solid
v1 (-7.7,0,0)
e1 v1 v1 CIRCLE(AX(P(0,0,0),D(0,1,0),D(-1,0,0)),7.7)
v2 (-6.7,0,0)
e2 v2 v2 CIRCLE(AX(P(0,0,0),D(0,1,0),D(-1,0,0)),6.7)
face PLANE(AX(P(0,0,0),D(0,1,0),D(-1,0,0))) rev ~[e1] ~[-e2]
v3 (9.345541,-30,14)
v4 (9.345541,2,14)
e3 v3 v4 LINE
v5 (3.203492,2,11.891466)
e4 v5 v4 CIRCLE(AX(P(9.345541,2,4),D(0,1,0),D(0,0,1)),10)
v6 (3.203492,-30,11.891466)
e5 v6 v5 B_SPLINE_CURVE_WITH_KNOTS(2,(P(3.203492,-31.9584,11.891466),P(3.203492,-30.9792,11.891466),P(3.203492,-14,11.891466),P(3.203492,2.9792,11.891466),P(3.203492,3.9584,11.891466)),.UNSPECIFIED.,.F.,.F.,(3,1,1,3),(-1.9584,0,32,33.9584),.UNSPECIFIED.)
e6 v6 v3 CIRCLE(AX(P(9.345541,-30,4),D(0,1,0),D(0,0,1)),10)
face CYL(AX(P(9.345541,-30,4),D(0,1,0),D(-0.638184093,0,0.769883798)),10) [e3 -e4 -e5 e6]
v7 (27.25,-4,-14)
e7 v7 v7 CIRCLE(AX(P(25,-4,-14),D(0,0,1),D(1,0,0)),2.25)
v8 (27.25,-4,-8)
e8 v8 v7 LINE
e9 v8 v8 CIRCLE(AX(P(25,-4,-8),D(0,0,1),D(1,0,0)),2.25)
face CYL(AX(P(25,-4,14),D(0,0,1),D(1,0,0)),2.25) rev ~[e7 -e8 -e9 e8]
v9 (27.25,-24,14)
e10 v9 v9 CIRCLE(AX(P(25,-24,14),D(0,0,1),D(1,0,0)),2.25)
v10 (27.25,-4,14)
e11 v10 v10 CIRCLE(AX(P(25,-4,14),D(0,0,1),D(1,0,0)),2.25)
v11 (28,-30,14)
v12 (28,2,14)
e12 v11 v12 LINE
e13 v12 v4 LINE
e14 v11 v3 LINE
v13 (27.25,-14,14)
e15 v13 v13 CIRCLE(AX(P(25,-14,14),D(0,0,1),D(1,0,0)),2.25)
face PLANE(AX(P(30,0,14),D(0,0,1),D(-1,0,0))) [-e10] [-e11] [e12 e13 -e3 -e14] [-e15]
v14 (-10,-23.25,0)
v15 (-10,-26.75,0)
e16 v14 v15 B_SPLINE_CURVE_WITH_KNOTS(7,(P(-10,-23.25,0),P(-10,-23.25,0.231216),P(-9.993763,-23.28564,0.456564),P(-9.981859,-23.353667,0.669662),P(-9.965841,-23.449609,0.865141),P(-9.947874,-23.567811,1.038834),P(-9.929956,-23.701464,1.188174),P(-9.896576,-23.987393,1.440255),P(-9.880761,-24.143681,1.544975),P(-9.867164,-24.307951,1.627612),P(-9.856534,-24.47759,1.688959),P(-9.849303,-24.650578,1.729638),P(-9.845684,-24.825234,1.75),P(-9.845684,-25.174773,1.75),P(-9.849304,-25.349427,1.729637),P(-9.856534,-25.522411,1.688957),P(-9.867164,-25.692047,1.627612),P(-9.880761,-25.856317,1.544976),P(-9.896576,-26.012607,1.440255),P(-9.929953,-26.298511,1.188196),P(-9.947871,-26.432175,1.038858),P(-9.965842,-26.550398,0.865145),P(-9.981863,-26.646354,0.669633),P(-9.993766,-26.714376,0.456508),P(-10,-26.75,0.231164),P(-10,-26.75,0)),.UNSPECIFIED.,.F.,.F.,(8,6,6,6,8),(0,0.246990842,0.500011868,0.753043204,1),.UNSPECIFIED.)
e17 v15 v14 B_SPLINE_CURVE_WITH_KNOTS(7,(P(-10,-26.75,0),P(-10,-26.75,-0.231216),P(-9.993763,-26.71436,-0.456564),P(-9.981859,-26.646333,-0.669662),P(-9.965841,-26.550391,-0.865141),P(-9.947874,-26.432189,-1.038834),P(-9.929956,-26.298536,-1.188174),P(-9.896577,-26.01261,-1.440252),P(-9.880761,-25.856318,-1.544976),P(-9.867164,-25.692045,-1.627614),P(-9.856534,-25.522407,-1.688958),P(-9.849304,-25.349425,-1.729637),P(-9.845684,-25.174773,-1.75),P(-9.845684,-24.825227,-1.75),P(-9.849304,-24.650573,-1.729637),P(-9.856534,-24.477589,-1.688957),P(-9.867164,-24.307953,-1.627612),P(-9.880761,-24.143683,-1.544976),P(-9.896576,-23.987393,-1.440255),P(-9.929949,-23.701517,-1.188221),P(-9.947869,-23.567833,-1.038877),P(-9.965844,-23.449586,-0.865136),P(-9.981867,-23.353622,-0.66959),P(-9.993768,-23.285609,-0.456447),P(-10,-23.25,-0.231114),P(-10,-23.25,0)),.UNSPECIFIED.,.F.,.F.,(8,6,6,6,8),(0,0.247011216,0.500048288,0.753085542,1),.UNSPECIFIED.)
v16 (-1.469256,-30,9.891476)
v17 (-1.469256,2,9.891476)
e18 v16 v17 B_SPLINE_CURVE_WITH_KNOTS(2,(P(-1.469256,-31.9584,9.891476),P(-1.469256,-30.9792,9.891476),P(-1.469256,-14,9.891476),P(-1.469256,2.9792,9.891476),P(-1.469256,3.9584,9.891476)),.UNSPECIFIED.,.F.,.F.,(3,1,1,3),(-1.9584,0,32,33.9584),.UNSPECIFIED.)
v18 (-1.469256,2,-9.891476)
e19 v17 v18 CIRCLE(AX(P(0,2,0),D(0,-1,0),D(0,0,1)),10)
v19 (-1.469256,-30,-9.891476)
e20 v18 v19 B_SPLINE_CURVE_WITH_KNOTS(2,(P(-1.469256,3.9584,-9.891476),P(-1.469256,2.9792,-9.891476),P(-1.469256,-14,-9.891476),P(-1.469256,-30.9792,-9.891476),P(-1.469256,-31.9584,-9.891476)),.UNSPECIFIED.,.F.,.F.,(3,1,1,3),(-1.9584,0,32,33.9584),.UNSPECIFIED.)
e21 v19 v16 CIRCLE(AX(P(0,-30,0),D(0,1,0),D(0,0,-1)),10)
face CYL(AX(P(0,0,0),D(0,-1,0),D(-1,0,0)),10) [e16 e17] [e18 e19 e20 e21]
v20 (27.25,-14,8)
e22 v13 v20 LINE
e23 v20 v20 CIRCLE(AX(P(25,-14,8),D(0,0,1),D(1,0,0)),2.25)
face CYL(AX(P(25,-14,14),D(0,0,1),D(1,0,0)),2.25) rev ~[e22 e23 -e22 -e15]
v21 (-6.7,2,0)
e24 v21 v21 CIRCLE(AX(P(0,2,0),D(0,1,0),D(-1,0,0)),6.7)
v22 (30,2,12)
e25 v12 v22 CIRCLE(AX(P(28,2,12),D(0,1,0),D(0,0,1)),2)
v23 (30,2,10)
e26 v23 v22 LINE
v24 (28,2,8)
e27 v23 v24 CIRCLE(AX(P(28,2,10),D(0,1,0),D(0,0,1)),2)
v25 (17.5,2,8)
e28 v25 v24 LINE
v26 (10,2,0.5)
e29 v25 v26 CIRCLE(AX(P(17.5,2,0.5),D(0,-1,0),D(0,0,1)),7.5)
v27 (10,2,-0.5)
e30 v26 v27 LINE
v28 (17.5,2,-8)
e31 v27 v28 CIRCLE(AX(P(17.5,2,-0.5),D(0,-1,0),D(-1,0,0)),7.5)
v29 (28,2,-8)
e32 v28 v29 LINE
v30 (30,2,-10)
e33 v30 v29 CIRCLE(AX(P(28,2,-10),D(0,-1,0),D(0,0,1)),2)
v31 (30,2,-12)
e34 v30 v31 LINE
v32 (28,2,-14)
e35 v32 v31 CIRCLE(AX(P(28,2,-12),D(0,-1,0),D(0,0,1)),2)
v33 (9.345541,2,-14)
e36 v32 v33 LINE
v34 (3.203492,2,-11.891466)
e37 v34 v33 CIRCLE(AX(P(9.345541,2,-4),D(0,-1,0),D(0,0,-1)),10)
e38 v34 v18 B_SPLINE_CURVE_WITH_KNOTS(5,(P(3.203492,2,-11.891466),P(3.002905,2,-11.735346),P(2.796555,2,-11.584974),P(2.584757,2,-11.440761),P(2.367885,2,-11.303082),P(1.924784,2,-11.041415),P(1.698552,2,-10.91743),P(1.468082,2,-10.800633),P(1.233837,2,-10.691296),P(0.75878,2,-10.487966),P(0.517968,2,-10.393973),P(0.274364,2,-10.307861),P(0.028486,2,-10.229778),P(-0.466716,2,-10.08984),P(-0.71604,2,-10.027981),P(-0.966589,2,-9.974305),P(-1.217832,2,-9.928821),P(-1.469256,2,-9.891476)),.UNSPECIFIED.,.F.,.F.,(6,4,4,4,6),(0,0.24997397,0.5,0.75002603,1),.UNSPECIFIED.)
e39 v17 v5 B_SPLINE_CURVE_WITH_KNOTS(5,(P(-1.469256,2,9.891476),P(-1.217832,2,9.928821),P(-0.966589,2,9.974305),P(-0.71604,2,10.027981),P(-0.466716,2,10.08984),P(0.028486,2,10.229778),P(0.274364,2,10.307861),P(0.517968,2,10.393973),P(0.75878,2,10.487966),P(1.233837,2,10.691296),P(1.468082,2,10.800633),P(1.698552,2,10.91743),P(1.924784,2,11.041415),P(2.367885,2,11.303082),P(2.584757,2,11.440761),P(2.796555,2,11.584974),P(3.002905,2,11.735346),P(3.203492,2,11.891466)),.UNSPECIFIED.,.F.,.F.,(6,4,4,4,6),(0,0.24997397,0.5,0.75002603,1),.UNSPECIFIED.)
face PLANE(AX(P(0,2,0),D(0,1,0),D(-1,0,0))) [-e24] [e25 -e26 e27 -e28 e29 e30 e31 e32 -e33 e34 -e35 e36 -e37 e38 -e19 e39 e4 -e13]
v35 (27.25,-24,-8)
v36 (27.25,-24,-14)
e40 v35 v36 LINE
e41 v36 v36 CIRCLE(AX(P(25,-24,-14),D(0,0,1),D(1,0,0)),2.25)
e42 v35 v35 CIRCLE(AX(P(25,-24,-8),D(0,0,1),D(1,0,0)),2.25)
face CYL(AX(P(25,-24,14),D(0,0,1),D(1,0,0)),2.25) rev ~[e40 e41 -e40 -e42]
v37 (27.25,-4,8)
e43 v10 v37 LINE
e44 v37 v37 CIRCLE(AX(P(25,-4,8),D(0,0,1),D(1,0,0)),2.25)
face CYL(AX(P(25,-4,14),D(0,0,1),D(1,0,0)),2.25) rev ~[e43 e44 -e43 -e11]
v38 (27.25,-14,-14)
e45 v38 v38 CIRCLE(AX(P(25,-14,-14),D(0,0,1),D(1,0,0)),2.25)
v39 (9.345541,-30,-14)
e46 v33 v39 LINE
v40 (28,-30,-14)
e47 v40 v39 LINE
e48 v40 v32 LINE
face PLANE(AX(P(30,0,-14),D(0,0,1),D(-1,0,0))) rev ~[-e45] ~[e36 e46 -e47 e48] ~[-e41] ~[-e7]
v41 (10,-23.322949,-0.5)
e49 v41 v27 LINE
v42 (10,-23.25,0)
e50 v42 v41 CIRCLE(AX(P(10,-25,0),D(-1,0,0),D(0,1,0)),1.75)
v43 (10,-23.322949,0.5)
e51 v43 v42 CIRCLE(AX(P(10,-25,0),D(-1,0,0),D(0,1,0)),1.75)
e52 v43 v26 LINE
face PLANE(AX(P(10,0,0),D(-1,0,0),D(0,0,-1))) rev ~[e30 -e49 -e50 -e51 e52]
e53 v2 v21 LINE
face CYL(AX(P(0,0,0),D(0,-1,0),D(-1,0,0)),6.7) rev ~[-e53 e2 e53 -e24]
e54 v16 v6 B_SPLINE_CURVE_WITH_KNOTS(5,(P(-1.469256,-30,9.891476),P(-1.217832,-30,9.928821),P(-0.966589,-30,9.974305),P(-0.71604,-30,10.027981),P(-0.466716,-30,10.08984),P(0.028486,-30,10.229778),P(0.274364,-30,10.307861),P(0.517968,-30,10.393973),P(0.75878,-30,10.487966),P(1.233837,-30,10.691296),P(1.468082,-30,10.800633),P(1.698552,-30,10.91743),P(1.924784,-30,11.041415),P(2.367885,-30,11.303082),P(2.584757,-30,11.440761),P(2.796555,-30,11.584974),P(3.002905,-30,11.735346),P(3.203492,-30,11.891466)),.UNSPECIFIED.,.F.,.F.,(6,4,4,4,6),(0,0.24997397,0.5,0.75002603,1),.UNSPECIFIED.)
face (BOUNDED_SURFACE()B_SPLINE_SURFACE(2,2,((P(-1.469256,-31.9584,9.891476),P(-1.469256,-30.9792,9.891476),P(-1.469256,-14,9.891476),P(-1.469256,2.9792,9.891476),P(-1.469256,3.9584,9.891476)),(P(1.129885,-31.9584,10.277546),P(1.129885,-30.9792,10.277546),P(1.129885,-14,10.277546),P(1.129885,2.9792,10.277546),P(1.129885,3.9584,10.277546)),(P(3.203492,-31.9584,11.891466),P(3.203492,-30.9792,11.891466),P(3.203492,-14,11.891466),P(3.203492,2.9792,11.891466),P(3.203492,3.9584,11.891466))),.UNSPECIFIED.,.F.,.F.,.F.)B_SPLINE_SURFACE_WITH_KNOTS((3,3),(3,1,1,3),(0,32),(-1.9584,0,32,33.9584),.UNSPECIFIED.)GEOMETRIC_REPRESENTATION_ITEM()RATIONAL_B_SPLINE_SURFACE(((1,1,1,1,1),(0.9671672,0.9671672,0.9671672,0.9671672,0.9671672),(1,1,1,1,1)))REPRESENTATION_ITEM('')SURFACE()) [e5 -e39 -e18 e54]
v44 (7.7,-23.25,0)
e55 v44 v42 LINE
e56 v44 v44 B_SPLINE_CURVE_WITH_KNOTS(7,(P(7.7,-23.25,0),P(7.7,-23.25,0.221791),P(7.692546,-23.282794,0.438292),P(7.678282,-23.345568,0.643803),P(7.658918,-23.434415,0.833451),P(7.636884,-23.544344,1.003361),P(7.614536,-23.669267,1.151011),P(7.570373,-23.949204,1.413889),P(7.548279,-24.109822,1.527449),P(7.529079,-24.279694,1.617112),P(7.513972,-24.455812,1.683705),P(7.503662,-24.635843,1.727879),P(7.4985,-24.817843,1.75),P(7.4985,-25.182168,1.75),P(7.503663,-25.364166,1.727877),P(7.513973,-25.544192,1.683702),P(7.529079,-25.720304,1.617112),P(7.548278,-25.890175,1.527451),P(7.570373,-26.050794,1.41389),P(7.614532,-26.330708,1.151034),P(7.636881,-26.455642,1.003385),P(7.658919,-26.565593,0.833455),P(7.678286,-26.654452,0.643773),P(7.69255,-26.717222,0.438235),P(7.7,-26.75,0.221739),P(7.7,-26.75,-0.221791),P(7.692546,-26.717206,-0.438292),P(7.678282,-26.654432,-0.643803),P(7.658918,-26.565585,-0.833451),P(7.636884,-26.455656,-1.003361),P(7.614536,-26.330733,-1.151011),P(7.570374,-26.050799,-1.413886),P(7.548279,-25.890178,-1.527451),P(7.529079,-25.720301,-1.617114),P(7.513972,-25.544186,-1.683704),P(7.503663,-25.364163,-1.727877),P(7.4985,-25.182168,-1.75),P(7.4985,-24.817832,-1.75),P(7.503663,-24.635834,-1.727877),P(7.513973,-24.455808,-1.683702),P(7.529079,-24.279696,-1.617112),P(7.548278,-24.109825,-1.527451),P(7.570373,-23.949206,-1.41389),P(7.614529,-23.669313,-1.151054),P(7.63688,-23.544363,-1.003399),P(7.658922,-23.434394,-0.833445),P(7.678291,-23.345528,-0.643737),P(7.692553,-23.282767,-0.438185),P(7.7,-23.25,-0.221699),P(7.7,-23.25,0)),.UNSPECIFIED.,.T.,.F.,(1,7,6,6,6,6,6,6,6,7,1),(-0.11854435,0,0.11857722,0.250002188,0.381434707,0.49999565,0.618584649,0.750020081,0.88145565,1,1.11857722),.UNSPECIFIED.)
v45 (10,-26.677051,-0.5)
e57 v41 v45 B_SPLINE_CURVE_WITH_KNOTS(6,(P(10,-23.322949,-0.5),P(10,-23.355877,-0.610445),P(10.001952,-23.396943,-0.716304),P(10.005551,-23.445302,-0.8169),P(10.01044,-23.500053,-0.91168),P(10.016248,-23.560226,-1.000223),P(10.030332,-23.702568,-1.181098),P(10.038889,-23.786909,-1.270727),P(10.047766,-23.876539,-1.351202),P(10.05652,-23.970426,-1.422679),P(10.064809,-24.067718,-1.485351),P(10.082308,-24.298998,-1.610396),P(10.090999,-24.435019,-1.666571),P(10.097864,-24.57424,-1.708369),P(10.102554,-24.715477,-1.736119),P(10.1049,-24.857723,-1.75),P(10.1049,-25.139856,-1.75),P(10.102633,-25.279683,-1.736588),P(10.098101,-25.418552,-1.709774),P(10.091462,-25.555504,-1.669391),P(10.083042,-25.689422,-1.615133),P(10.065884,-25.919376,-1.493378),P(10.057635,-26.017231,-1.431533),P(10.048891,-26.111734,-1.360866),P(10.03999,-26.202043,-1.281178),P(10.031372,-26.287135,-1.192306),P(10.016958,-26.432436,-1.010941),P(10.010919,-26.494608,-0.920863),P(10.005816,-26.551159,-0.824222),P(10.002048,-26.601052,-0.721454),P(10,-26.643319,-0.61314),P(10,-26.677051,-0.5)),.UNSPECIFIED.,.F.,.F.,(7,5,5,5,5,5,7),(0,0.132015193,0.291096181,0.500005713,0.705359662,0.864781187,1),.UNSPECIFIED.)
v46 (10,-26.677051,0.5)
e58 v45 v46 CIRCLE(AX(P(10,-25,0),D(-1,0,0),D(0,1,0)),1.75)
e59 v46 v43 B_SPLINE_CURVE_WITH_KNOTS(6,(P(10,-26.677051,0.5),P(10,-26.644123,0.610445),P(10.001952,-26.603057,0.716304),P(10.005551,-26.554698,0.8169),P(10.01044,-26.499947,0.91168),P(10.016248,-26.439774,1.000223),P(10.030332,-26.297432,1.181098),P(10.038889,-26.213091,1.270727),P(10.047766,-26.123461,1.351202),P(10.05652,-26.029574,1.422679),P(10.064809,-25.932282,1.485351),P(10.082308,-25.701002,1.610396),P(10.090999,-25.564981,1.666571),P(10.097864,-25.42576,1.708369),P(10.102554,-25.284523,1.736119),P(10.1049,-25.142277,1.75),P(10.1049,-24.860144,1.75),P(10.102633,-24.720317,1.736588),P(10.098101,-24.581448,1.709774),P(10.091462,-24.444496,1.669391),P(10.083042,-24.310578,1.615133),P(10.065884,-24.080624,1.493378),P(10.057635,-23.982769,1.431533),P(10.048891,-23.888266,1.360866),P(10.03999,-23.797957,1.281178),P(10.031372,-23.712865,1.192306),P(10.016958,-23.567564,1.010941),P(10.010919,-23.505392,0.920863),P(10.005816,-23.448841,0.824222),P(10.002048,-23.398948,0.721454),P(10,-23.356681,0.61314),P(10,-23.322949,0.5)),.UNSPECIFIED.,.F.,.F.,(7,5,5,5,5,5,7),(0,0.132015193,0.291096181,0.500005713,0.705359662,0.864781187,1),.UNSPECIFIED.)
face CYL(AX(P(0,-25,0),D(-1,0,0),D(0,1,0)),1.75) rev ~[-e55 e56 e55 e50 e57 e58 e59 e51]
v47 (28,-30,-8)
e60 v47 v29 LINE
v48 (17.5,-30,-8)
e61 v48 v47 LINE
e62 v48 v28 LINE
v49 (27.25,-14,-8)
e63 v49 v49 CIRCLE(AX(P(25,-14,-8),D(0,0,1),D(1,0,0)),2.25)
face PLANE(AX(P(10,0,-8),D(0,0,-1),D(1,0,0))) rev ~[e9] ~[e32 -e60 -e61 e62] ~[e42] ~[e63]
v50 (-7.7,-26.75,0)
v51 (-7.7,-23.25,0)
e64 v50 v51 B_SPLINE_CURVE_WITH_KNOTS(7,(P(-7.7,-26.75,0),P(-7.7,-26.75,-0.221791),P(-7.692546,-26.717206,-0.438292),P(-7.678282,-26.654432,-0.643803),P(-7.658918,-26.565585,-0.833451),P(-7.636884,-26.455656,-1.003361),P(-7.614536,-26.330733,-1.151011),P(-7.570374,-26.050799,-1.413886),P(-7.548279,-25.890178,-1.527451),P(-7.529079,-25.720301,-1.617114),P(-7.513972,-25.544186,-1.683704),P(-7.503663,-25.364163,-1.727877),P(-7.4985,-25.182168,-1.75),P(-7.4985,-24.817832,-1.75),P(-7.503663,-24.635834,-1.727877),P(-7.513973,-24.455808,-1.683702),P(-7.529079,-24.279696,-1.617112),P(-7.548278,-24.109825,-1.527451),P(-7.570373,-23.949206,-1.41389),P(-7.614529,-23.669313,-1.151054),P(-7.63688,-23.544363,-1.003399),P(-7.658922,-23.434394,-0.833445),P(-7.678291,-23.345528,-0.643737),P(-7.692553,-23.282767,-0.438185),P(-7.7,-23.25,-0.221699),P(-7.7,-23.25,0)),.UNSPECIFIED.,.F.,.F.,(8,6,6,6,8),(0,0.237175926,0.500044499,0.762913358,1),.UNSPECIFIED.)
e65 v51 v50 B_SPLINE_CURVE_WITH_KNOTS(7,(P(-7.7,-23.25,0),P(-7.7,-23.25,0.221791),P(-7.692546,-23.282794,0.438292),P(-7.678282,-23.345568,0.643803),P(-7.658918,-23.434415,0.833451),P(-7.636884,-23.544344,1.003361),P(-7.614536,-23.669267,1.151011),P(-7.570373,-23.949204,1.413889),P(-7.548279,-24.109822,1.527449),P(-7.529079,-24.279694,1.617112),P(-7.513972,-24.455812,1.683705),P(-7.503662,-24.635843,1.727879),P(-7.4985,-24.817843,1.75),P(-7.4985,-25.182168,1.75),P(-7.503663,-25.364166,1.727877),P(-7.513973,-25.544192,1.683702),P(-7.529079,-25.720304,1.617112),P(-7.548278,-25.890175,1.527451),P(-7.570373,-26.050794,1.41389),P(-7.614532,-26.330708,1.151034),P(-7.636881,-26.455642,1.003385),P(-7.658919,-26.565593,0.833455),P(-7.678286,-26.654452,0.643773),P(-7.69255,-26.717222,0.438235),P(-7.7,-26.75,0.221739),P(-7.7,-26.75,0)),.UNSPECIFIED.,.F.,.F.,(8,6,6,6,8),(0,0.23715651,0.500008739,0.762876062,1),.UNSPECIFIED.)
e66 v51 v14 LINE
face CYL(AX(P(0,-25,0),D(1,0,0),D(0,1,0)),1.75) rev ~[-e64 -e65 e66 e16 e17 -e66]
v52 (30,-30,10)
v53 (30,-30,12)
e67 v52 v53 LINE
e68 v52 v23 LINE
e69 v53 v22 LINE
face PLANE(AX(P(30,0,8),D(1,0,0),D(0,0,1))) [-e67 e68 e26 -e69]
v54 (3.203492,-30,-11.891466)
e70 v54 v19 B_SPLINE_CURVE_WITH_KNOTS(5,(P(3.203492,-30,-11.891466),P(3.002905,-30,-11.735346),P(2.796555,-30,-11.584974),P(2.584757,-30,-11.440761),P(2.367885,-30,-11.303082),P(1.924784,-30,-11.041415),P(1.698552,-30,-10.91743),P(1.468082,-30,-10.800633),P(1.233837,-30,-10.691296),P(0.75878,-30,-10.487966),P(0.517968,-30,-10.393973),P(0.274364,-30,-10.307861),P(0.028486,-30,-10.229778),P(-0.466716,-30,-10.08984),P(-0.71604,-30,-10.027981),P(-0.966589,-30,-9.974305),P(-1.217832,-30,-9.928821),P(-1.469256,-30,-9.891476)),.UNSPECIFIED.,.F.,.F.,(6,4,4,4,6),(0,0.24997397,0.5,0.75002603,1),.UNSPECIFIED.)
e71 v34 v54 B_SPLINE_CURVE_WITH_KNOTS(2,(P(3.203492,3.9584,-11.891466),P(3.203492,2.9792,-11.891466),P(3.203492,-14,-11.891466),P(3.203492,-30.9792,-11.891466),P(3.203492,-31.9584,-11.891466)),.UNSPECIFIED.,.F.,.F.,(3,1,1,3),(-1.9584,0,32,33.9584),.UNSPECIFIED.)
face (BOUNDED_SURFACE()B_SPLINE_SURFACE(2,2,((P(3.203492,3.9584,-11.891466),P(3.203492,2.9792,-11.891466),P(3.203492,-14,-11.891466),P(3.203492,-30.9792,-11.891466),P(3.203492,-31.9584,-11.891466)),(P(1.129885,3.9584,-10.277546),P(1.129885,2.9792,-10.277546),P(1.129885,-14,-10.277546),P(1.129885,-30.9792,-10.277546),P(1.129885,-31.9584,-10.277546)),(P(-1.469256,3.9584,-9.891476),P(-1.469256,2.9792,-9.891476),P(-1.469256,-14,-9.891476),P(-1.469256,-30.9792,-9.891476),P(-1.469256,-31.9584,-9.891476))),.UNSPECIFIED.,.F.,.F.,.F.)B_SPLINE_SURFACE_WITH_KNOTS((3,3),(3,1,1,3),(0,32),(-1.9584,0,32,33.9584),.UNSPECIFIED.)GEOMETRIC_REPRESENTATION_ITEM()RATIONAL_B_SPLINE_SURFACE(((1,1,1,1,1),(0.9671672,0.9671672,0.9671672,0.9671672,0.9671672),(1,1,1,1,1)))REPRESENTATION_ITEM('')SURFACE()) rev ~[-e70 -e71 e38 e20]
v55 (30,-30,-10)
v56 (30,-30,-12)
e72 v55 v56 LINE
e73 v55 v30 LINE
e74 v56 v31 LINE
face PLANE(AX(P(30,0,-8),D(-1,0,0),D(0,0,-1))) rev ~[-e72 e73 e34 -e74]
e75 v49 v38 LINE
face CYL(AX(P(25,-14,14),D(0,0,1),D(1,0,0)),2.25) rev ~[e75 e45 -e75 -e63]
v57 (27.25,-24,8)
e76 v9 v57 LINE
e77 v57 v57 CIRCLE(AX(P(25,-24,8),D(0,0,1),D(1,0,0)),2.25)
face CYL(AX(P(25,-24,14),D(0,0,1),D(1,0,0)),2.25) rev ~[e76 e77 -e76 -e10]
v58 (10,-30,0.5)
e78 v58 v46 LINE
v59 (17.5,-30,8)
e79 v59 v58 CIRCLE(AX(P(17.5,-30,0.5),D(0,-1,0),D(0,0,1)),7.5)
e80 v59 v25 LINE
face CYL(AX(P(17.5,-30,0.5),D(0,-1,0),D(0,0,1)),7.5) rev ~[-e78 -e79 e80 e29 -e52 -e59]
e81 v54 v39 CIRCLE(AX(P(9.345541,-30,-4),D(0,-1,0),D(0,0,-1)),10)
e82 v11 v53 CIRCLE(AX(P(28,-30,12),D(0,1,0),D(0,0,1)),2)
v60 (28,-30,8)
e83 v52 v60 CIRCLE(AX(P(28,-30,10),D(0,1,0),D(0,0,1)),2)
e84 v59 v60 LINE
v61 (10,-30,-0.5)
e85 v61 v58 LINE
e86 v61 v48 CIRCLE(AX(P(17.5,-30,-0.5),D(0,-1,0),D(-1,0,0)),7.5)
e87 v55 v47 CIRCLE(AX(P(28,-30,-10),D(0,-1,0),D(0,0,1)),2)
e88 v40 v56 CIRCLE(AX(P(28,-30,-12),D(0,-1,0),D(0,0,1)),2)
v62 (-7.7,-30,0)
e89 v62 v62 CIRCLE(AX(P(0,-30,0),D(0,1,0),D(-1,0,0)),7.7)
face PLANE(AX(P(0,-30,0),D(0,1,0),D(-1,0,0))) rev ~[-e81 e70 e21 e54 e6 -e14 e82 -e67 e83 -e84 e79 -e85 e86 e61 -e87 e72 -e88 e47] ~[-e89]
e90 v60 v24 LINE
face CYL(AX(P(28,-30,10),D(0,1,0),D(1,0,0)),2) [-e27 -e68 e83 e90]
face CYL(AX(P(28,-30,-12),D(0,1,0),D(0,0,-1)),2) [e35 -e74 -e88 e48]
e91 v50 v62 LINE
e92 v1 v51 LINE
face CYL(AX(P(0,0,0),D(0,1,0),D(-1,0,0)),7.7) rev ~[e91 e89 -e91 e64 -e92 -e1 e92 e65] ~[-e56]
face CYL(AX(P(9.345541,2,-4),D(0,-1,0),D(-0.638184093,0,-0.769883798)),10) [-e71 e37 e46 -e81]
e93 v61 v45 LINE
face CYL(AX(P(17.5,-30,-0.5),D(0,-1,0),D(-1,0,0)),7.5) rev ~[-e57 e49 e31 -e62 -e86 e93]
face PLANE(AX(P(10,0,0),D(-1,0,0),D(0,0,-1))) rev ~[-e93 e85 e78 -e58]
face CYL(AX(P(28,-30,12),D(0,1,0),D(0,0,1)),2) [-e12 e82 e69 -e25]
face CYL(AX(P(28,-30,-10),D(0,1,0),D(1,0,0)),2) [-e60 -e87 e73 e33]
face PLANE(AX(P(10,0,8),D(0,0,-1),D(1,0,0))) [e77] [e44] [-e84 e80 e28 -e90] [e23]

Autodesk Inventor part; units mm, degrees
ref_plane "YZ Plane" through (0, 0, 0) normal (1, 0, 0) x (0, 1, 0)
ref_plane "XZ Plane" through (0, 0, 0) normal (0, 1, 0) x (-1, 0, 0)
ref_plane "XY Plane" through (0, 0, 0) normal (0, 0, 1) x (1, 0, 0)
sketch "Sketch1" plane through (0, 0, 0) normal (0, 1, 0) x (-1, 0, 0)
  circle A0 centre (0, 0) radius 10
  circle A1 centre (0, 0) radius 6.7
  circle A2 centre (0, 0) radius 7.7
  line L0 (-10, 8) -> (-10, -8)
  line L1 (0, 0) -> (-40.0758, 0) construction
  line L2 (-5, 8) -> (-30, 8)
  line L3 (-30, 8) -> (-30, 14)
  line L4 (-30, 14) -> (-5, 14)
  line L5 (-5, 14) -> (-5, 8)
  line L6 (-5, -8) -> (-30, -8)
  line L7 (-30, -8) -> (-30, -14)
  line L8 (-30, -14) -> (-5, -14)
  line L9 (-5, -14) -> (-5, -8)
  line L10 (0, -10) -> (-5, -11)
  line L11 (0, 10) -> (-5, 11)
  point P0 (-10, 0)
  point P1 (-10, 0)
  point P2 (2.5508, 9.6692)
  point P3 (2.5508, -9.6692)
  point P4 (-30, 11)
  point P5 (-10, 8)
  point P6 (-5, 8.6603)
  point P7 (-5, -8.6603)
  point P8 (-6, -8)
  point P9 (-6, 8)
  dimension "d0" = 13.4
  dimension "d1" = 15.4
  dimension "d37" = 20
  dimension "d38" = 20
  dimension "d39" = 6
  dimension "d40" = 5
  dimension "d46" = 16
extrude "Extrusion1" add sketch "Sketch1" along normal blind 2 contours A0 L9 L6 L2 L5 | A0 L5 L11 | L10 L9 A0 | L5 L2 A0 | A0 L2 L3 L4 L5 | L9 L8 L7 L6 A0 | A0 L6 L9 | A0 L0 L2 | L6 L0 A0 | A2
extrude "Extrusion2" add sketch "Sketch1" against normal blind 30 contours A0 L9 L6 L2 L5 | A0 L5 L11 | L10 L9 A0 | L5 L2 A0 | A0 L2 L3 L4 L5 | L9 L8 L7 L6 A0 | A0 L6 L9 | A0 L0 L2 | L6 L0 A0
sketch "Sketch2" plane through (0, 0, 0) normal (1, 0, 0) x (0, 1, 0)
  circle A0 centre (-25, 0) radius 1.75
  line L0 (-30, -7.7) -> (-30, 7.7) projected
  point P0 (0, 0)
  dimension "d7" = 3.5
  dimension "d8" = 5
extrude "Extrusion3" cut sketch "Sketch2" along normal mid plane 62.5
fillet "Fillet2" radius 7.5 2 edges at (10, -14, -8) (10, -14, 8)
sketch "Sketch4" plane through (29.508, -30, 14) normal (0, 0, 1) x (1, 0, 0)
  circle A0 centre (-4.508, 6) radius 2.25
  circle A1 centre (-4.508, 16) radius 2.25
  circle A2 centre (-4.508, 26) radius 2.25
  line L0 (-4.508, 6) -> (-4.508, 16) construction
  line L1 (-4.508, 16) -> (-4.508, 26) construction
  line L2 (0.492, 0) -> (0.492, 32) projected
  point P0 (-29.508, 30)
  point P1 (0.492, 16)
  point P2 (0.492, 16)
  dimension "d32" = 4.5
  dimension "d33" = 10
  dimension "d41" = 5
extrude "Extrusion7" cut sketch "Sketch4" against normal up to surface (28 mm away)
fillet "Fillet5" radius 10 2 edges at (5, -14, -11) (5, -14, 11)
fillet "Fillet6" radius 10 2 edges at (5, -14, -14) (5, -14, 14)
fillet "Fillet7" radius 10 2 edges at (0, -14, 10) (0, -14, -10)
fillet "Fillet4" radius 2 4 edges at (30, -14, -14) (30, -14, -8) (30, -14, 8) (30, -14, 14)
properties part number "button bottom part 1"
